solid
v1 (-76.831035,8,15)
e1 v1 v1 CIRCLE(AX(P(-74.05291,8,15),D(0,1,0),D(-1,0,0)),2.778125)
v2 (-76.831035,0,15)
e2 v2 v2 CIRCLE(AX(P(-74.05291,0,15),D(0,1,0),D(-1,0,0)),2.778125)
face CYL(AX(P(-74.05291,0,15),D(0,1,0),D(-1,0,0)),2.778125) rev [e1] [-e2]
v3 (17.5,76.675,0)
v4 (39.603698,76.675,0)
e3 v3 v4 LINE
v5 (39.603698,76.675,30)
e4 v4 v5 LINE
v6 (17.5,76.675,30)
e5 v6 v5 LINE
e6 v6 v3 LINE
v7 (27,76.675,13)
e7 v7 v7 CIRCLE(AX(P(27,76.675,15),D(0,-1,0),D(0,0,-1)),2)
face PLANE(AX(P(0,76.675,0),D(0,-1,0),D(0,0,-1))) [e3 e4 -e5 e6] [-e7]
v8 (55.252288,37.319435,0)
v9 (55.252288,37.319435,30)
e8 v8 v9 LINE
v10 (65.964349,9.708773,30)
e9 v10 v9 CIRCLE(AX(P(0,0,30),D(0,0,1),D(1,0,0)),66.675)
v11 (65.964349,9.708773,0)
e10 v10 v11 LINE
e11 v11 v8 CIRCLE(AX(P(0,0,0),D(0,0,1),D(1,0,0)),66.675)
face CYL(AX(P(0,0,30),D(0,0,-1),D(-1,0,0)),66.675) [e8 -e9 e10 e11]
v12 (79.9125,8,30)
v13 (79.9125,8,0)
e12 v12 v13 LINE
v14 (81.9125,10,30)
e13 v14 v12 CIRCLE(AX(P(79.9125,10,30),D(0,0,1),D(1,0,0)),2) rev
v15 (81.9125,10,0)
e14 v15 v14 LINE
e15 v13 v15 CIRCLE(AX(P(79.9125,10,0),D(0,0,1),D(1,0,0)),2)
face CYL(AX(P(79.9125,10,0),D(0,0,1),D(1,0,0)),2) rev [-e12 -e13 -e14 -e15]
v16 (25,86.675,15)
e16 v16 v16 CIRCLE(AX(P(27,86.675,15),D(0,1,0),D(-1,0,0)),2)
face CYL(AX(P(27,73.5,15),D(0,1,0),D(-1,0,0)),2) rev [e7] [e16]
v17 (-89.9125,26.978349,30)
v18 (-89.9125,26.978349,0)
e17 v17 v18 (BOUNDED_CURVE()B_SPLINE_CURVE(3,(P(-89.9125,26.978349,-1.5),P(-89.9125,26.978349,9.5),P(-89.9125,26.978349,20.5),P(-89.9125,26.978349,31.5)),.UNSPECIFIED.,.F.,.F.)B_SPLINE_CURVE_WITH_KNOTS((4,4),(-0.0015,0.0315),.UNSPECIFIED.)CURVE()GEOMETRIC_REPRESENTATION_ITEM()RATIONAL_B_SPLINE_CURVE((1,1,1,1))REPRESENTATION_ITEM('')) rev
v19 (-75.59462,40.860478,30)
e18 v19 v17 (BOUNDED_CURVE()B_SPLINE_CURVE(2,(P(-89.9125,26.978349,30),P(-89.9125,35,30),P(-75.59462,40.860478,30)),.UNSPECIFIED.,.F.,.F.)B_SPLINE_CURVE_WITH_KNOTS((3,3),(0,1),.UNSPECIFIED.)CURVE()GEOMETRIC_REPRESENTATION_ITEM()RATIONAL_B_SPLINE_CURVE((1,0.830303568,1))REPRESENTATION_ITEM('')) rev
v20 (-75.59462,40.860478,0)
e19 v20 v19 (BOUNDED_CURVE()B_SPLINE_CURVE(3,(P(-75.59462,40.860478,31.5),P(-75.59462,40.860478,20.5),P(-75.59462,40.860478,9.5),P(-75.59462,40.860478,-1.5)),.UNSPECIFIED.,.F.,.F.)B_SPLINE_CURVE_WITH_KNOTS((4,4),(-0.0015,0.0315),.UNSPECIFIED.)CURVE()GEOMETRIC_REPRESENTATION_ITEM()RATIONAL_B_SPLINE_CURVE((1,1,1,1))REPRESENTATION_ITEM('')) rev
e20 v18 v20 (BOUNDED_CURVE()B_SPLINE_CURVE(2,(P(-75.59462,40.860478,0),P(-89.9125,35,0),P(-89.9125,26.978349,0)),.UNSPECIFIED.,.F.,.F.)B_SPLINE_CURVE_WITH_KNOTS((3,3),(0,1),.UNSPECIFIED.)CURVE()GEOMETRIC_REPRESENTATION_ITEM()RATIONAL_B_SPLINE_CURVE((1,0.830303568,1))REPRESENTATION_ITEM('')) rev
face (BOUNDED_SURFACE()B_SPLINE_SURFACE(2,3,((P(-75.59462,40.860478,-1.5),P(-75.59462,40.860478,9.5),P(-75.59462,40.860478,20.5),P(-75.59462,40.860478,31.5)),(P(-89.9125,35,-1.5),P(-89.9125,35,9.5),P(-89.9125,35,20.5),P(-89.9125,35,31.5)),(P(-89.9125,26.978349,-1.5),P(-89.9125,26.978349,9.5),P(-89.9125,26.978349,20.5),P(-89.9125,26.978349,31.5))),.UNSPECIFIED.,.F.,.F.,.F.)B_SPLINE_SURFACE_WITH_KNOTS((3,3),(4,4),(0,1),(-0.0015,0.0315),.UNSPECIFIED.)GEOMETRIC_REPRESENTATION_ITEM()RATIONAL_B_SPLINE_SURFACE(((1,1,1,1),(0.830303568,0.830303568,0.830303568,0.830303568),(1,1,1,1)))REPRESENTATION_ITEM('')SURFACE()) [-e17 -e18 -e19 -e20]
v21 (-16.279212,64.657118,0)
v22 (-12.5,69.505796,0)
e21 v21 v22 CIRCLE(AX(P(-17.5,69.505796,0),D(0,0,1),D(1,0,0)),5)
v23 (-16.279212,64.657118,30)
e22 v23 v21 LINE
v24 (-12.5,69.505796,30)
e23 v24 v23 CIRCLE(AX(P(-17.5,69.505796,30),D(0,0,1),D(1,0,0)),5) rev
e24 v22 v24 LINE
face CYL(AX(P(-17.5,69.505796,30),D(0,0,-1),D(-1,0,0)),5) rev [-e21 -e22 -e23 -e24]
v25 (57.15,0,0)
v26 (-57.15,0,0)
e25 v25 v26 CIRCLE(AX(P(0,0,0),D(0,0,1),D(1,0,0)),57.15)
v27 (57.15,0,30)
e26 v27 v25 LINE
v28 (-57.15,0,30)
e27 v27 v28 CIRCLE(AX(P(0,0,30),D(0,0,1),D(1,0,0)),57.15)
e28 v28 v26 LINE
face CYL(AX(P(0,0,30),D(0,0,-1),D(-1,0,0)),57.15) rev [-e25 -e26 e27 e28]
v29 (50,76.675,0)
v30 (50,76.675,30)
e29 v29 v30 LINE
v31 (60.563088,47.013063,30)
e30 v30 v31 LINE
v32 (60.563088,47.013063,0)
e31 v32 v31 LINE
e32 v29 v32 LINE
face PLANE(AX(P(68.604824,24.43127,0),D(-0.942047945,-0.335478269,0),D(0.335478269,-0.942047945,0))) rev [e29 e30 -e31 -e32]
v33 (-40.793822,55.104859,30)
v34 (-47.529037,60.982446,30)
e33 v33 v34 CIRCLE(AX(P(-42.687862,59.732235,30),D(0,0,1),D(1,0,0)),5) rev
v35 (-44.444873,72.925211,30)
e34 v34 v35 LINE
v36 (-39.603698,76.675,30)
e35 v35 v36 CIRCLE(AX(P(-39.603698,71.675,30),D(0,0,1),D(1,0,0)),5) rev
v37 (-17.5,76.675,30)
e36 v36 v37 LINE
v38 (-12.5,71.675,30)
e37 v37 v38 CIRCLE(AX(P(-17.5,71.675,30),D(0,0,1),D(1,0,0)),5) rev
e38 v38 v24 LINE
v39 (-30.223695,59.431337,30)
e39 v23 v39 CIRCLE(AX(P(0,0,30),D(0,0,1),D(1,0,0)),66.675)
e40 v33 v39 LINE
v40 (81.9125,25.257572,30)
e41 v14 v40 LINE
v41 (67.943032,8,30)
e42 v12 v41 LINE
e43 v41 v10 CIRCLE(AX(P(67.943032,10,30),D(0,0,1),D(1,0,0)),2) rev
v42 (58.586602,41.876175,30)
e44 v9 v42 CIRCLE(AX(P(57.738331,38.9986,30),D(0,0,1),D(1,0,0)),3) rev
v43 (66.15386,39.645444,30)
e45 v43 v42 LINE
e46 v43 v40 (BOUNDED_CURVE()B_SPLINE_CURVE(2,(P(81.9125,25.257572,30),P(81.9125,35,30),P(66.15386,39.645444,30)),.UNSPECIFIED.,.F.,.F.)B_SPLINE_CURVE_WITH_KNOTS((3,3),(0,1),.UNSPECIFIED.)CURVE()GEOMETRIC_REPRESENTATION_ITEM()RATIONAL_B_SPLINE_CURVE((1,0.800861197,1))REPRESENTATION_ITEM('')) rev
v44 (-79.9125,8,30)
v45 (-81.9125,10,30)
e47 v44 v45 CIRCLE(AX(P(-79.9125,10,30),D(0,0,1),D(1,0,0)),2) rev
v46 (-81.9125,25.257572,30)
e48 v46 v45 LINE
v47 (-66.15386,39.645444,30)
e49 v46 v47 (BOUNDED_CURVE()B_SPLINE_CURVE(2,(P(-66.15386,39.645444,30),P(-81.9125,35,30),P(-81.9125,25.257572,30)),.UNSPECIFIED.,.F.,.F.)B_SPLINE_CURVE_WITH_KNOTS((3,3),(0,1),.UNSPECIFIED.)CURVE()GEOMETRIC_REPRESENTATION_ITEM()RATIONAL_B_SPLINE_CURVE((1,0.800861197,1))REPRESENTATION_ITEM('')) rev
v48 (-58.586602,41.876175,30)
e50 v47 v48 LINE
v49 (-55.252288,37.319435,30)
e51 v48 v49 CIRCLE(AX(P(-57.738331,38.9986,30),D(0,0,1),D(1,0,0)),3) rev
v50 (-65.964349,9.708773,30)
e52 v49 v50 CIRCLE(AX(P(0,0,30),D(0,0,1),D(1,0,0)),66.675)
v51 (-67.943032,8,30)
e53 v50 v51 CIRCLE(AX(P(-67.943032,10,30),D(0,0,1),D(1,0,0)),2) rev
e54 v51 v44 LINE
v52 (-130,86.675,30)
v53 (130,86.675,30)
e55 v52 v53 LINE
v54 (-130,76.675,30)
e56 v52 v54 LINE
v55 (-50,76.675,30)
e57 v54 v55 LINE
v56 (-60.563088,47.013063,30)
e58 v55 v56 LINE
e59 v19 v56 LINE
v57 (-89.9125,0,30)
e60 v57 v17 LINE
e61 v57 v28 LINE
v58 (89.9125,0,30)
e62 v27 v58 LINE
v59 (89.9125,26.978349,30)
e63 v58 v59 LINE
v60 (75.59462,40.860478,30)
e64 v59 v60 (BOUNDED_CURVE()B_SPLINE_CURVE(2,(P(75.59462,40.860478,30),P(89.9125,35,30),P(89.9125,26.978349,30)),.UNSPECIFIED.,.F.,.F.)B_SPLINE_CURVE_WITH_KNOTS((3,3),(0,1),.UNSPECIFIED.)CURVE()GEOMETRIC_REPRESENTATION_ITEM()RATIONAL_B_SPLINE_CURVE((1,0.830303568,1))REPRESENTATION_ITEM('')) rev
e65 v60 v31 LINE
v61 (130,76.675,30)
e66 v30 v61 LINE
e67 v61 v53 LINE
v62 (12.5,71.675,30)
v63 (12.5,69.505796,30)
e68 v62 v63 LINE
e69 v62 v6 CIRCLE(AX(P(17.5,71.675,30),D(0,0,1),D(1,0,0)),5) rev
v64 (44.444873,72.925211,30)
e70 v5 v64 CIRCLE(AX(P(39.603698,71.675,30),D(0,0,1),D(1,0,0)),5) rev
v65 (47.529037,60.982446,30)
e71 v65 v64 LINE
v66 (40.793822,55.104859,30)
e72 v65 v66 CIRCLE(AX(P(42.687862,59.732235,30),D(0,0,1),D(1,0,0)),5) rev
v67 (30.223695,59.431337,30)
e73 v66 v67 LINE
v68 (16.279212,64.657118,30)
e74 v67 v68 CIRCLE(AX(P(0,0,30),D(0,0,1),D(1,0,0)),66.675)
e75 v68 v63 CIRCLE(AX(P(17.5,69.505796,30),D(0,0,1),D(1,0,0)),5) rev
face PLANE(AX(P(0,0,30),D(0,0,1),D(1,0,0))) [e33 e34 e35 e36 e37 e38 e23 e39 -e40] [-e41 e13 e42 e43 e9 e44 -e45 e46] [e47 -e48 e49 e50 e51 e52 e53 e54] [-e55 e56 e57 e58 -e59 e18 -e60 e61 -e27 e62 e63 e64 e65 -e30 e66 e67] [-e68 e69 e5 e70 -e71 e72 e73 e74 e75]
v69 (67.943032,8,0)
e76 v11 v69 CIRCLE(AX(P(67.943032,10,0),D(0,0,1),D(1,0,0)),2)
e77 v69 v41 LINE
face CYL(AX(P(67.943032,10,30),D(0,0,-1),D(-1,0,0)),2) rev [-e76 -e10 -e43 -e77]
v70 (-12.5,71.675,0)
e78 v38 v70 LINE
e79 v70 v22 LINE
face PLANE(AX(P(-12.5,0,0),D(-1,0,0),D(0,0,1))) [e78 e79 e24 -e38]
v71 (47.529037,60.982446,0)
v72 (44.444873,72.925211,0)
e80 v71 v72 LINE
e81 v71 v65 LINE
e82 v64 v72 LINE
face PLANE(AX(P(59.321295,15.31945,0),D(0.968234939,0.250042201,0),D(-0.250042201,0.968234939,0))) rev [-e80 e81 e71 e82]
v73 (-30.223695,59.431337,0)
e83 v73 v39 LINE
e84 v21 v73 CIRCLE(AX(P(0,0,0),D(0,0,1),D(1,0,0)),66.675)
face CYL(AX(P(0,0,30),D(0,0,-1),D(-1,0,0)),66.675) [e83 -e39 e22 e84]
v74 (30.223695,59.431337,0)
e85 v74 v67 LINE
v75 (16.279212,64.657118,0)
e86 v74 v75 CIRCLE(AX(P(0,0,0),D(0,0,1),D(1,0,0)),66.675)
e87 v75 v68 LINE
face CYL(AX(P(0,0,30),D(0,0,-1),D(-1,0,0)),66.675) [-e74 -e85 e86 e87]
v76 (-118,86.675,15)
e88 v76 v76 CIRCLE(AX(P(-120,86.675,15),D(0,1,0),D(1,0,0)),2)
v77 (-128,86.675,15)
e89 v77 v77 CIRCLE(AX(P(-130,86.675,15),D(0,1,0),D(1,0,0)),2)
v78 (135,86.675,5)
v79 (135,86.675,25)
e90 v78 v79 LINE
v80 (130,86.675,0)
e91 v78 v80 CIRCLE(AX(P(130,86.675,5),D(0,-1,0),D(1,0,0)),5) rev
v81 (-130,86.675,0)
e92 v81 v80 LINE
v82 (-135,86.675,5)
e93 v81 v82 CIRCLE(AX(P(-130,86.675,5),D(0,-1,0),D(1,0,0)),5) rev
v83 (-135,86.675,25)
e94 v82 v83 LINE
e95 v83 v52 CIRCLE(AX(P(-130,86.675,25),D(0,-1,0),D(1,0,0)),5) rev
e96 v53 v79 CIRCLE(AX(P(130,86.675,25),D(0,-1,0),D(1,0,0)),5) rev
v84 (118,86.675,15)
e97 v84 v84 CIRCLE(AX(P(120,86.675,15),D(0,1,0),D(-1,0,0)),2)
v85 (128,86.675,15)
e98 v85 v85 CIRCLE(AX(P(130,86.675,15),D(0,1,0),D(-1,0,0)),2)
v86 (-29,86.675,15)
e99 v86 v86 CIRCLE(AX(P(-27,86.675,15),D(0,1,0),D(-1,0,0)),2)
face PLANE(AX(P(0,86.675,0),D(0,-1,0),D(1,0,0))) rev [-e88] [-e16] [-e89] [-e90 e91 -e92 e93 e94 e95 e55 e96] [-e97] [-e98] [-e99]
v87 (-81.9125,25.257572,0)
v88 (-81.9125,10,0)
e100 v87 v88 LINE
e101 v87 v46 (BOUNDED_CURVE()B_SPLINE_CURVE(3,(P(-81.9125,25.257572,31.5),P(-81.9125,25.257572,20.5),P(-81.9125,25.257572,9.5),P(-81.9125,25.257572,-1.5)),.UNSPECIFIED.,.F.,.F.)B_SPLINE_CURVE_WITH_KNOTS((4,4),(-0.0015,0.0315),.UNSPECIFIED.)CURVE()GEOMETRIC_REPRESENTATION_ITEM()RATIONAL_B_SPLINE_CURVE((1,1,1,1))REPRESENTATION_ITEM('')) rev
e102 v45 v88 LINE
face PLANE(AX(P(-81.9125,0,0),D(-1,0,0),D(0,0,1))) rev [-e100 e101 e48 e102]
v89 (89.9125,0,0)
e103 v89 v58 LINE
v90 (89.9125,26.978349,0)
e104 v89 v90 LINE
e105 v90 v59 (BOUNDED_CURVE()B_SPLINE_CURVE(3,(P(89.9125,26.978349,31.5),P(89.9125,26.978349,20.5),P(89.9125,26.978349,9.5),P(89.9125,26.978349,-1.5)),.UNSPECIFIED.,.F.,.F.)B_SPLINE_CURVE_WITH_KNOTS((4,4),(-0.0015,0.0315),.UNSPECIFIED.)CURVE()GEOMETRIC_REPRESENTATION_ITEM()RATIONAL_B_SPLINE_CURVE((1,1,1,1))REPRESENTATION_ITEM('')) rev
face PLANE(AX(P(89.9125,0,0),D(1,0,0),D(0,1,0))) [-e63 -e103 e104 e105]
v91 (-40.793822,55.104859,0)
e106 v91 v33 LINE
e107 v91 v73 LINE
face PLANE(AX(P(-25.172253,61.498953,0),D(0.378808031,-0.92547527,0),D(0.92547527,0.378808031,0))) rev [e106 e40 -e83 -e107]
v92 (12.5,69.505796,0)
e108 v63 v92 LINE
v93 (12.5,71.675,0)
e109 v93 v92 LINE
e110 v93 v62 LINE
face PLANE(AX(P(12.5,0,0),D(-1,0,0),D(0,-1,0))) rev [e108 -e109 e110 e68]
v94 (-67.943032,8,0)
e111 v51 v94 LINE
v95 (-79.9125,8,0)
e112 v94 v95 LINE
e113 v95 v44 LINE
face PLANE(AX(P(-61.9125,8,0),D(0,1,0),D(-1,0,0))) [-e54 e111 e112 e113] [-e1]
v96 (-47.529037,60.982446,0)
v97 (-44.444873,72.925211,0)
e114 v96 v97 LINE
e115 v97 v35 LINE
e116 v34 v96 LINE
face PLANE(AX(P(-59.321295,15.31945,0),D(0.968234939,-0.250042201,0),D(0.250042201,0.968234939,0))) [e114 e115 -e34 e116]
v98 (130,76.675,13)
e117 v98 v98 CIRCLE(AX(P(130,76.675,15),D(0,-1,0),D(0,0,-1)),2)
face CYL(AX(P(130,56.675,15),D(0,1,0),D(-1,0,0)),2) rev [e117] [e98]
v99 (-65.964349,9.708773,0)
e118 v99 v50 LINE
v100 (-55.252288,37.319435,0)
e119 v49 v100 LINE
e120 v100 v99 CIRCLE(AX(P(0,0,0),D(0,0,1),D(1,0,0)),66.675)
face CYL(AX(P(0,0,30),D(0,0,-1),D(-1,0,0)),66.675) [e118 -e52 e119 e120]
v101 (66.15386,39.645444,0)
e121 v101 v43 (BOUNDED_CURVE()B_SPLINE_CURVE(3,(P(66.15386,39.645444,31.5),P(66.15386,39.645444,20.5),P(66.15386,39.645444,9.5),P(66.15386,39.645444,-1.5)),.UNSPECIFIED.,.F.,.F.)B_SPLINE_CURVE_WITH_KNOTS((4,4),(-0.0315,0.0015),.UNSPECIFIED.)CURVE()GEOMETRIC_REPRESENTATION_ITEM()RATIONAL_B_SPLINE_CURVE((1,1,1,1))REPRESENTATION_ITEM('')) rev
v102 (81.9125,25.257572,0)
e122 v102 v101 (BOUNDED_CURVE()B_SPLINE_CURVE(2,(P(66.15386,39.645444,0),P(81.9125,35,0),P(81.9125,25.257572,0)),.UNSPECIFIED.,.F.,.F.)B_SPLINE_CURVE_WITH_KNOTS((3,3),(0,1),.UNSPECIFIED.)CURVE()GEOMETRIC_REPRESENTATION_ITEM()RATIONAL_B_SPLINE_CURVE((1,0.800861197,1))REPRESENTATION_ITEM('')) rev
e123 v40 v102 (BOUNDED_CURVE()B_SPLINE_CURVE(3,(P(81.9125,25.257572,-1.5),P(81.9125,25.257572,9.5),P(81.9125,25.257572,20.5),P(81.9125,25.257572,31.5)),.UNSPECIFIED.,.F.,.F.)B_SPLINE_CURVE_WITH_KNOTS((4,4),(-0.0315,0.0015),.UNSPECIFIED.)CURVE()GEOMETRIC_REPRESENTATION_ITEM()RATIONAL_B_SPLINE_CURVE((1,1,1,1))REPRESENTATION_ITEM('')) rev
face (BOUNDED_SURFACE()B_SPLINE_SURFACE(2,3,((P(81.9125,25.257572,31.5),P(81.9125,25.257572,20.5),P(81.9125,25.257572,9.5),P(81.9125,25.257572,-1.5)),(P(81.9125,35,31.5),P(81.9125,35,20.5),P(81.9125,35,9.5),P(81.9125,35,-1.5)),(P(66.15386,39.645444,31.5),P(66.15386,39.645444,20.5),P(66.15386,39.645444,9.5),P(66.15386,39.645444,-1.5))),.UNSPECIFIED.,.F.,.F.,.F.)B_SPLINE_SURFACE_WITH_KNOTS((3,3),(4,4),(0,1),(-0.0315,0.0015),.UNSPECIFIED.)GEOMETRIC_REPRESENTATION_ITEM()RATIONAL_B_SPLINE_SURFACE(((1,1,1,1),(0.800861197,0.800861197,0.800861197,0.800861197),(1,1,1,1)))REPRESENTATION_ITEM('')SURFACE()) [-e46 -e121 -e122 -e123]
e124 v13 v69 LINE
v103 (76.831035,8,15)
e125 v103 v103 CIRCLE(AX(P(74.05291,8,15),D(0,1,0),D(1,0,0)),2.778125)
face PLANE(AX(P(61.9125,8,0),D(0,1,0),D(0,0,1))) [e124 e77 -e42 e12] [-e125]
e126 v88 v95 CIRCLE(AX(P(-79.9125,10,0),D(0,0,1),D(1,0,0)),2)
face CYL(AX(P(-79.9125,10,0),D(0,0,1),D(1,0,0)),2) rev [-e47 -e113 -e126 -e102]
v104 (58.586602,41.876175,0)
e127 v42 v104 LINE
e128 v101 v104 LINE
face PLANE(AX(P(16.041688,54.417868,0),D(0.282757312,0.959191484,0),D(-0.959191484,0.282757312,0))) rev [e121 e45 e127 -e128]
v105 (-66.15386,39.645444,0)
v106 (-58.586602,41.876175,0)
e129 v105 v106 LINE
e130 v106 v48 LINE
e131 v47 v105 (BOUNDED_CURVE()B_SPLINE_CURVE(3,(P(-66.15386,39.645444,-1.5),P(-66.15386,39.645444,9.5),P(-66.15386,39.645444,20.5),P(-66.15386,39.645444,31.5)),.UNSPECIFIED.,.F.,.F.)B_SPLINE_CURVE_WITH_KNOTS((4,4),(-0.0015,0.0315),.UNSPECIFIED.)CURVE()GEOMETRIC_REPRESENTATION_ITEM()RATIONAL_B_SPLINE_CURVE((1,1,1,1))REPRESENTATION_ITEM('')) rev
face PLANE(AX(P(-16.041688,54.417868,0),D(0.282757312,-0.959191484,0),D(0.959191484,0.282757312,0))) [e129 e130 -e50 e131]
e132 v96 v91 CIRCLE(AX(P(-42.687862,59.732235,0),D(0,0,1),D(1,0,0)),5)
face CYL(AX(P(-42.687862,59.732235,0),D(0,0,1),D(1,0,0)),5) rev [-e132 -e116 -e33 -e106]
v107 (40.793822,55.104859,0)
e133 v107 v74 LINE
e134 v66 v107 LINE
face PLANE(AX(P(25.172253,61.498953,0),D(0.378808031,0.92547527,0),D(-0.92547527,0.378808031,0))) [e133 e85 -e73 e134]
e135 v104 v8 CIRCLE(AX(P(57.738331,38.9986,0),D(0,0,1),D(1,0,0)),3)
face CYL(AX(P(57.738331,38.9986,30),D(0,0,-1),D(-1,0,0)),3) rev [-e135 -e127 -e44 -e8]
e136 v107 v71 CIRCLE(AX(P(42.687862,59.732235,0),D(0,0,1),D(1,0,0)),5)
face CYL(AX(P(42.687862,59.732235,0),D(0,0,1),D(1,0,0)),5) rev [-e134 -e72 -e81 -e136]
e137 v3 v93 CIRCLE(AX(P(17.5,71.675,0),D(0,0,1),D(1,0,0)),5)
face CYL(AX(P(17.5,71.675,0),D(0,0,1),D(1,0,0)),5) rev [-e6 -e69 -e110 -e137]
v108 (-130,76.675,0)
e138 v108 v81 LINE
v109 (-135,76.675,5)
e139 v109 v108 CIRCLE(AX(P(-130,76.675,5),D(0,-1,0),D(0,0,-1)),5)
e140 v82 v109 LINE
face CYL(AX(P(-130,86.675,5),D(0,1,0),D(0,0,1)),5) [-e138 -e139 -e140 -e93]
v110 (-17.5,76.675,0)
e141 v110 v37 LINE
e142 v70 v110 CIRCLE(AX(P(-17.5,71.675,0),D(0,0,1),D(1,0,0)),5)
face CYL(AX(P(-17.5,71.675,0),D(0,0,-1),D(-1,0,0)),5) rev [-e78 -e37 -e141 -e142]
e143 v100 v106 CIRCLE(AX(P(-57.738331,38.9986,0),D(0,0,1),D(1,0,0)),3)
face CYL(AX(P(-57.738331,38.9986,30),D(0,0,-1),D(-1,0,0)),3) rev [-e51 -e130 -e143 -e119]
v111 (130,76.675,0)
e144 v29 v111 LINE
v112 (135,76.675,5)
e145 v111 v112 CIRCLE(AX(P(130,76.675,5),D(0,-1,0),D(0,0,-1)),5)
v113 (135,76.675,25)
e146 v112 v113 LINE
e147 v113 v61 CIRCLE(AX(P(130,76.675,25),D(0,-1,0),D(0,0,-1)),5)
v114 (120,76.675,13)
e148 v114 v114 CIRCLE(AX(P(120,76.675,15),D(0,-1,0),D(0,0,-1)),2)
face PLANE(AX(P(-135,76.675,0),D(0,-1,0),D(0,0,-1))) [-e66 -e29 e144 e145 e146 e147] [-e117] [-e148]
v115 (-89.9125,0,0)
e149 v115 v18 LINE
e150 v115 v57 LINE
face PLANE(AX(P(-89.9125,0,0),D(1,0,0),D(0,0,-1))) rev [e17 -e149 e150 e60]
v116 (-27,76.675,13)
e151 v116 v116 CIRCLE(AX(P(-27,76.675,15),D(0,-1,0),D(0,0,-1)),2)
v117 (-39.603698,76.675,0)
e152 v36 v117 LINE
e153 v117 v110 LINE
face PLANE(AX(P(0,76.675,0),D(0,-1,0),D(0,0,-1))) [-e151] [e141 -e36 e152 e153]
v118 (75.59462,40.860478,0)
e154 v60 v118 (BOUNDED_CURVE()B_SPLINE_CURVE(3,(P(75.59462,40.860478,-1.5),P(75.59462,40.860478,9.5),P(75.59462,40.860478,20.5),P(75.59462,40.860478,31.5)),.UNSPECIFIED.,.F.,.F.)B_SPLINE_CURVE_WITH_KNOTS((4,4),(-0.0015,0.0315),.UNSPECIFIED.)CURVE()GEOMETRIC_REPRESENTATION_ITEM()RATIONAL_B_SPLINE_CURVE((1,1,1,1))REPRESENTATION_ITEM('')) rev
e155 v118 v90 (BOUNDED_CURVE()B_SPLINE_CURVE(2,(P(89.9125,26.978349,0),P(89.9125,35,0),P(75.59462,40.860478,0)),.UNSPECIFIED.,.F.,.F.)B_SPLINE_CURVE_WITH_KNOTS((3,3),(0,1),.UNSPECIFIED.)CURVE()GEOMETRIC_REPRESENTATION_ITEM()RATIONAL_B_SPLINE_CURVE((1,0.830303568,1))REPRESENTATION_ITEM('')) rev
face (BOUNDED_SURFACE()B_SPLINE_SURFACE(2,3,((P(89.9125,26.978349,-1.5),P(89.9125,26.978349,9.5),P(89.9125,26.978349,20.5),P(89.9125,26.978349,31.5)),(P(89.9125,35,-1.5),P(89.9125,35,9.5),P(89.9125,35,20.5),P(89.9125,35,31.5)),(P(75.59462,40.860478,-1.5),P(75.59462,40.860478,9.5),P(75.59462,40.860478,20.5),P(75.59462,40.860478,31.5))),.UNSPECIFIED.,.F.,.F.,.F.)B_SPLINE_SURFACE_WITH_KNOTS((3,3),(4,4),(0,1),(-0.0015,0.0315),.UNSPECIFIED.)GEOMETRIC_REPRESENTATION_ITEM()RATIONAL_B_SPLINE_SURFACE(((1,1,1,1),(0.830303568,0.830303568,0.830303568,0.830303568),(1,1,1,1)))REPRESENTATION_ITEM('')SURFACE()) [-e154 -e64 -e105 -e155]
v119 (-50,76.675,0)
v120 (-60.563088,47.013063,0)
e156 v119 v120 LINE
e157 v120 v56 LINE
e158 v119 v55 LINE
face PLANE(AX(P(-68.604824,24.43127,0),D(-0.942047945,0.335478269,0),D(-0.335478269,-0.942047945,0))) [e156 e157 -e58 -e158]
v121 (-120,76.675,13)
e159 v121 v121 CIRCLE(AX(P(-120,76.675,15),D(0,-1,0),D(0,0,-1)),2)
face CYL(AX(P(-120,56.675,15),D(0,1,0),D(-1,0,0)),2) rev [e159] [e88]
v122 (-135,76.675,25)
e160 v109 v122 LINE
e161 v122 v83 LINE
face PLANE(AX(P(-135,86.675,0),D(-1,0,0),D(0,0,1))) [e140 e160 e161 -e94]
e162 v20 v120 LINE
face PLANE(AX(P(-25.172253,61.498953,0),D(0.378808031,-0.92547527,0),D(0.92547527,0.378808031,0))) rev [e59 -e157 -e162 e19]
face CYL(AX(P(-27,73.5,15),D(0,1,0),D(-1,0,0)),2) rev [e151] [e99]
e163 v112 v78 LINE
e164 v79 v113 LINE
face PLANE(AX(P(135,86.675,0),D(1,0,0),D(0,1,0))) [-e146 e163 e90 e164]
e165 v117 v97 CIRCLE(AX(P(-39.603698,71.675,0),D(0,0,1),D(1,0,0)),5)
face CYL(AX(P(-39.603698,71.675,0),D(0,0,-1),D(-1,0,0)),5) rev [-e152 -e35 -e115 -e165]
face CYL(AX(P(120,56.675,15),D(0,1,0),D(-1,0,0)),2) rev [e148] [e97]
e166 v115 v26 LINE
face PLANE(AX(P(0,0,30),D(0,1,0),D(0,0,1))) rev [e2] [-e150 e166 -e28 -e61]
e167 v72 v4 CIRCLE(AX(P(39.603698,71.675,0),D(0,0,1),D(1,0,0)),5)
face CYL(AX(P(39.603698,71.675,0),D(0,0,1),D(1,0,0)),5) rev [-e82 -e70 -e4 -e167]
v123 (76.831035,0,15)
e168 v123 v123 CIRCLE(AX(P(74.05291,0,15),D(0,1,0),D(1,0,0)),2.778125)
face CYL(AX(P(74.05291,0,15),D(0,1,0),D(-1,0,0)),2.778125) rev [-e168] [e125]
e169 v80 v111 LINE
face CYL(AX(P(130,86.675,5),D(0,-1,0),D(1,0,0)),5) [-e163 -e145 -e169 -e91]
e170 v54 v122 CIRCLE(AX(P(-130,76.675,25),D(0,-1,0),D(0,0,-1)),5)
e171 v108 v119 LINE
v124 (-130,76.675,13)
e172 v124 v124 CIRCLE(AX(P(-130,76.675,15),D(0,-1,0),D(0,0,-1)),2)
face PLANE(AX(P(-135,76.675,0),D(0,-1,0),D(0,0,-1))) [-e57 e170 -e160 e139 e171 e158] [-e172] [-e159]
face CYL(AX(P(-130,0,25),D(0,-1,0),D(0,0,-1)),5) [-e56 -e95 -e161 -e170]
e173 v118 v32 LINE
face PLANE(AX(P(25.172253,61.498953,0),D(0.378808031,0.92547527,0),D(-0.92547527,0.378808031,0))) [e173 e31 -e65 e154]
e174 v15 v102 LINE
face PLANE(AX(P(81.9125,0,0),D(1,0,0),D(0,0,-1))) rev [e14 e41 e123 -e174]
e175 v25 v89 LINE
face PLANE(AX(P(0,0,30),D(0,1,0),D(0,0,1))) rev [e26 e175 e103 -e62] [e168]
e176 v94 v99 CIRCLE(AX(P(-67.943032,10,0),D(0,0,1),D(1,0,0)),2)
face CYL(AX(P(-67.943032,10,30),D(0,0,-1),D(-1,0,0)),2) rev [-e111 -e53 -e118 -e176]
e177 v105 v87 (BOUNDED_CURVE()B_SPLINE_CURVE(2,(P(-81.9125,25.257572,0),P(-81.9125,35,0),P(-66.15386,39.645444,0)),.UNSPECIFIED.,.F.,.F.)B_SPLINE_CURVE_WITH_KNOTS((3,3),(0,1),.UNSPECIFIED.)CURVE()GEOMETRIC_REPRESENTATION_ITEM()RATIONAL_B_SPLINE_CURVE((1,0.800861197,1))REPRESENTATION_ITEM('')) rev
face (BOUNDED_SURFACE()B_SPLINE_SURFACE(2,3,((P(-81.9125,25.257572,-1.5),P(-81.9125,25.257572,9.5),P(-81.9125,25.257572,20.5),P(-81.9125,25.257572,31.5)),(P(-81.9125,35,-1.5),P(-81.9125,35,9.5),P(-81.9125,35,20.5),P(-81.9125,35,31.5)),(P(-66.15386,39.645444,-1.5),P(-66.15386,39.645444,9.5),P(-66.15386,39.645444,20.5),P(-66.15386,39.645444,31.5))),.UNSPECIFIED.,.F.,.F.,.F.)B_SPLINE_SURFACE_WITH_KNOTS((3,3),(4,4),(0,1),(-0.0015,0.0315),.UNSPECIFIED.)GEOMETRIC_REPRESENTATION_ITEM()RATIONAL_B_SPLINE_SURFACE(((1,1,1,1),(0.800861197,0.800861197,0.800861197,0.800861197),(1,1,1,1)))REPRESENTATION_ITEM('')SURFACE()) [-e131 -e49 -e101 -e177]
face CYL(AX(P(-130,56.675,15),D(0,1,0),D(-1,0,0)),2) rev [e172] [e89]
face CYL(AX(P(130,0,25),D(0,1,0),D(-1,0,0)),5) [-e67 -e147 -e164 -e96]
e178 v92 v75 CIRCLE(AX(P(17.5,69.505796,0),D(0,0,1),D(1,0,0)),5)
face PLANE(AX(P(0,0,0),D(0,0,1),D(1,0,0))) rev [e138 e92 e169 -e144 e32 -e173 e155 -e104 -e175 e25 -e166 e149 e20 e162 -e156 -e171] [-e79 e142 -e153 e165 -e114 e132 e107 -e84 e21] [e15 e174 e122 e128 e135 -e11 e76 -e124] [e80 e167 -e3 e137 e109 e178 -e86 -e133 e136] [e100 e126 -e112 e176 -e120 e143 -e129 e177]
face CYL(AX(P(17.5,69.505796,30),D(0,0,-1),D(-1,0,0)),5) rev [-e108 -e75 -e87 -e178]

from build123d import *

# Parameters (mm, degrees)
BOSS_EXTRUDE1_DEPTH = 30
SKETCH2_W           = 20
SKETCH2_H           = 8
BOSS_EXTRUDE2_DEPTH = 30
BOSS_EXTRUDE3_DEPTH = 30
SKETCH5_R           = 2.778125
CUT_EXTRUDE2_DEPTH  = 112.476514483
FILLET6_R           = 2
FILLET8_R           = 3
BOSS_EXTRUDE4_START = -30
SKETCH6_W           = 100
SKETCH6_H           = 10
BOSS_EXTRUDE4_DEPTH = 30
FILLET9_R           = 5
FILLET10_R          = 5
SKETCH7_W           = 270
SKETCH7_H           = 10
BOSS_EXTRUDE5_DEPTH = 30
SKETCH8_R           = 2
CUT_EXTRUDE3_DEPTH  = 30
FILLET11_R          = 5
SKETCH9_R           = 2
CUT_EXTRUDE4_DEPTH  = 13.175


with BuildPart() as part:
    # Sketch1 → Boss-Extrude1 (new body)
    with BuildSketch(Plane.XY):
        with BuildLine():
            ThreePointArc((66.675, 0), (0, 66.675), (-66.675, 0))
            Line((-66.675, 0), (-57.15, 0))
            ThreePointArc((-57.15, 0), (0, 57.15), (57.15, 0))
            Line((57.15, 0), (66.675, 0))
        make_face()
    extrude(amount=BOSS_EXTRUDE1_DEPTH)

    # Sketch2 → Boss-Extrude2 (add)
    with BuildSketch(Plane.XY.offset(30)):
        with Locations((-71.9125, 4)):
            Rectangle(SKETCH2_W, SKETCH2_H)
        with Locations((71.9125, 4)):
            Rectangle(SKETCH2_W, SKETCH2_H)
    extrude(amount=-BOSS_EXTRUDE2_DEPTH)

    # Sketch4 → Boss-Extrude3 (add)
    with BuildSketch(Plane.XY.offset(30)):
        Polygon((-89.9125, 0), (-81.9125, 0), (-81.9125, 35), (-40.473552557, 47.215668719), (-30.223695263, 59.431337438), (-89.9125, 35), align=None)
        Polygon((30.223695263, 59.431337438), (40.473552557, 47.215668719), (81.9125, 35), (81.9125, 0), (89.9125, 0), (89.9125, 35), align=None)
    extrude(amount=-BOSS_EXTRUDE3_DEPTH)

    # Sketch5 → Cut-Extrude2 (cut, through all)
    with BuildSketch(Plane(origin=(0, 8, 0), x_dir=(1, 0, 0), z_dir=(0, 1, 0))):
        with Locations(Location((-74.052910047, -15, 0), (0, 0, 180))):
            Circle(SKETCH5_R)
        with Locations((74.052910047, -15)):
            Circle(SKETCH5_R)
    extrude(amount=-CUT_EXTRUDE2_DEPTH, mode=Mode.SUBTRACT)

    # Fillet6
    fillet6_edges = [part.edges().sort_by_distance(p)[0] for p in [
        (-81.9125, 8, 15),
        (-66.193320093, 8, 15),
        (66.193320093, 8, 15),
        (81.9125, 8, 15),
    ]]
    fillet(fillet6_edges, radius=FILLET6_R)

    # Fillet7
    # a fillet whose section is not a circle: 20, 15 mm, written as the material it adds along each edge
    with BuildSketch(Plane(origin=(81.9125, 35, 30), x_dir=(-0.9591914836749359, 0.28275731227587253, 0), z_dir=(0, 0, -1))) as fillet7_piece_1:
        with BuildLine():
            Bezier((16.42908698, 0), (0, 0), (-2.754742693, -9.344853754), weights=[1, 0.800861197, 1])
            Line((-2.754742693, -9.344853754), (0, 0))
            Line((0, 0), (16.42908698, 0))
        make_face()
    extrude(amount=30)
    with BuildSketch(Plane(origin=(-81.9125, 35, 30), x_dir=(0, -1, 0), z_dir=(0, 0, -1))) as fillet7_piece_2:
        with BuildLine():
            Bezier((9.742427777, 0), (0, 0), (-4.645444478, -15.758640316), weights=[1, 0.800861197, 1])
            Line((-4.645444478, -15.758640316), (0, 0))
            Line((0, 0), (9.742427777, 0))
        make_face()
    extrude(amount=30)
    # a fillet whose section is not a circle: 20, 15 mm, written as the material it takes off along each edge
    with BuildSketch(Plane(origin=(89.9125, 35, 68.677099201), x_dir=(0, -1, 0), z_dir=(0, 0, -1))) as fillet7_2_piece_1:
        with BuildLine():
            Bezier((8.021650729, 0), (0, 0), (-5.860478322, 14.317879531), weights=[1, 0.830303568, 1])
            Line((-5.860478322, 14.317879531), (0, 0))
            Line((0, 0), (8.021650729, 0))
        make_face()
    extrude(amount=107.354198402, mode=Mode.SUBTRACT)
    with BuildSketch(Plane(origin=(-89.9125, 35, 68.677099201), x_dir=(0.9254752700268907, 0.37880803128847984, 0), z_dir=(0, 0, -1))) as fillet7_2_piece_2:
        with BuildLine():
            Bezier((15.47083968, 0), (0, 0), (-3.03866572, 7.423839374), weights=[1, 0.830303568, 1])
            Line((-3.03866572, 7.423839374), (0, 0))
            Line((0, 0), (15.47083968, 0))
        make_face()
    extrude(amount=107.354198402, mode=Mode.SUBTRACT)

    # Fillet8
    fillet8_edges = [part.edges().sort_by_distance(p)[0] for p in [
        (-49.639626869, 44.513627906, 15),
        (49.639626869, 44.513627906, 15),
    ]]
    fillet(fillet8_edges, radius=FILLET8_R)

    # Sketch6 → Boss-Extrude4 (add)
    with BuildSketch(Plane.XY.offset(30).offset(BOSS_EXTRUDE4_START)):
        with Locations((0, 81.675)):
            Rectangle(SKETCH6_W, SKETCH6_H)
        Polygon((-43.476507509, 76.675), (-50, 76.675), (-60.5630878, 47.013063358), (-50.022382459, 51.327499376), align=None)
        with BuildLine():
            Line((12.5, 76.675), (-12.5, 76.675))
            Line((-12.5, 76.675), (-12.5, 65.492790634))
            ThreePointArc((-12.5, 65.492790634), (0, 66.675), (12.5, 65.492790634))
            Line((12.5, 65.492790634), (12.5, 76.675))
        make_face()
        Polygon((60.5630878, 47.013063358), (50, 76.675), (43.476507509, 76.675), (50.022382459, 51.327499376), align=None)
    extrude(amount=BOSS_EXTRUDE4_DEPTH)

    # Fillet9
    fillet9_edges = [part.edges().sort_by_distance(p)[0] for p in [
        (43.476507509, 76.675, 15),
        (12.5, 76.675, 15),
        (12.5, 65.492790634, 15),
        (-12.5, 65.492790634, 15),
        (-12.5, 76.675, 15),
        (-43.476507509, 76.675, 15),
    ]]
    fillet(fillet9_edges, radius=FILLET9_R)

    # Fillet10
    fillet10_edges = [part.edges().sort_by_distance(p)[0] for p in [
        (-50.022382459, 51.327499376, 15),
        (50.022382459, 51.327499376, 15),
    ]]
    fillet(fillet10_edges, radius=FILLET10_R)

    # Sketch7 → Boss-Extrude5 (add)
    with BuildSketch(Plane.XY.offset(30)):
        with Locations((0, 81.675)):
            Rectangle(SKETCH7_W, SKETCH7_H)
    extrude(amount=-BOSS_EXTRUDE5_DEPTH)

    # Sketch8 → Cut-Extrude3 (cut)
    with BuildSketch(Plane(origin=(0, 86.675, 0), x_dir=(1, 0, 0), z_dir=(0, 1, 0))):
        with Locations(Location((130, -15, 0), (0, 0, 180))):
            Circle(SKETCH8_R)
        with Locations(Location((120, -15, 0), (0, 0, 180))):
            Circle(SKETCH8_R)
        with Locations(Location((-120, -15, 0), (0, 0, 90))):
            Circle(SKETCH8_R)
        with Locations(Location((-130, -15, 0), (0, 0, 90))):
            Circle(SKETCH8_R)
    extrude(amount=-CUT_EXTRUDE3_DEPTH, mode=Mode.SUBTRACT)

    # Fillet11
    fillet11_edges = [part.edges().sort_by_distance(p)[0] for p in [
        (135, 81.675, 30),
        (-135, 81.675, 0),
        (135, 81.675, 0),
        (-135, 81.675, 30),
    ]]
    fillet(fillet11_edges, radius=FILLET11_R)

    # Sketch9 → Cut-Extrude4 (cut)
    with BuildSketch(Plane(origin=(0, 86.675, 0), x_dir=(1, 0, 0), z_dir=(0, 1, 0))):
        with Locations(Location((27, -15, 0), (0, 0, 180))):
            Circle(SKETCH9_R)
        with Locations(Location((-27, -15, 0), (0, 0, 180))):
            Circle(SKETCH9_R)
    extrude(amount=-CUT_EXTRUDE4_DEPTH, mode=Mode.SUBTRACT)


solid = part.part
